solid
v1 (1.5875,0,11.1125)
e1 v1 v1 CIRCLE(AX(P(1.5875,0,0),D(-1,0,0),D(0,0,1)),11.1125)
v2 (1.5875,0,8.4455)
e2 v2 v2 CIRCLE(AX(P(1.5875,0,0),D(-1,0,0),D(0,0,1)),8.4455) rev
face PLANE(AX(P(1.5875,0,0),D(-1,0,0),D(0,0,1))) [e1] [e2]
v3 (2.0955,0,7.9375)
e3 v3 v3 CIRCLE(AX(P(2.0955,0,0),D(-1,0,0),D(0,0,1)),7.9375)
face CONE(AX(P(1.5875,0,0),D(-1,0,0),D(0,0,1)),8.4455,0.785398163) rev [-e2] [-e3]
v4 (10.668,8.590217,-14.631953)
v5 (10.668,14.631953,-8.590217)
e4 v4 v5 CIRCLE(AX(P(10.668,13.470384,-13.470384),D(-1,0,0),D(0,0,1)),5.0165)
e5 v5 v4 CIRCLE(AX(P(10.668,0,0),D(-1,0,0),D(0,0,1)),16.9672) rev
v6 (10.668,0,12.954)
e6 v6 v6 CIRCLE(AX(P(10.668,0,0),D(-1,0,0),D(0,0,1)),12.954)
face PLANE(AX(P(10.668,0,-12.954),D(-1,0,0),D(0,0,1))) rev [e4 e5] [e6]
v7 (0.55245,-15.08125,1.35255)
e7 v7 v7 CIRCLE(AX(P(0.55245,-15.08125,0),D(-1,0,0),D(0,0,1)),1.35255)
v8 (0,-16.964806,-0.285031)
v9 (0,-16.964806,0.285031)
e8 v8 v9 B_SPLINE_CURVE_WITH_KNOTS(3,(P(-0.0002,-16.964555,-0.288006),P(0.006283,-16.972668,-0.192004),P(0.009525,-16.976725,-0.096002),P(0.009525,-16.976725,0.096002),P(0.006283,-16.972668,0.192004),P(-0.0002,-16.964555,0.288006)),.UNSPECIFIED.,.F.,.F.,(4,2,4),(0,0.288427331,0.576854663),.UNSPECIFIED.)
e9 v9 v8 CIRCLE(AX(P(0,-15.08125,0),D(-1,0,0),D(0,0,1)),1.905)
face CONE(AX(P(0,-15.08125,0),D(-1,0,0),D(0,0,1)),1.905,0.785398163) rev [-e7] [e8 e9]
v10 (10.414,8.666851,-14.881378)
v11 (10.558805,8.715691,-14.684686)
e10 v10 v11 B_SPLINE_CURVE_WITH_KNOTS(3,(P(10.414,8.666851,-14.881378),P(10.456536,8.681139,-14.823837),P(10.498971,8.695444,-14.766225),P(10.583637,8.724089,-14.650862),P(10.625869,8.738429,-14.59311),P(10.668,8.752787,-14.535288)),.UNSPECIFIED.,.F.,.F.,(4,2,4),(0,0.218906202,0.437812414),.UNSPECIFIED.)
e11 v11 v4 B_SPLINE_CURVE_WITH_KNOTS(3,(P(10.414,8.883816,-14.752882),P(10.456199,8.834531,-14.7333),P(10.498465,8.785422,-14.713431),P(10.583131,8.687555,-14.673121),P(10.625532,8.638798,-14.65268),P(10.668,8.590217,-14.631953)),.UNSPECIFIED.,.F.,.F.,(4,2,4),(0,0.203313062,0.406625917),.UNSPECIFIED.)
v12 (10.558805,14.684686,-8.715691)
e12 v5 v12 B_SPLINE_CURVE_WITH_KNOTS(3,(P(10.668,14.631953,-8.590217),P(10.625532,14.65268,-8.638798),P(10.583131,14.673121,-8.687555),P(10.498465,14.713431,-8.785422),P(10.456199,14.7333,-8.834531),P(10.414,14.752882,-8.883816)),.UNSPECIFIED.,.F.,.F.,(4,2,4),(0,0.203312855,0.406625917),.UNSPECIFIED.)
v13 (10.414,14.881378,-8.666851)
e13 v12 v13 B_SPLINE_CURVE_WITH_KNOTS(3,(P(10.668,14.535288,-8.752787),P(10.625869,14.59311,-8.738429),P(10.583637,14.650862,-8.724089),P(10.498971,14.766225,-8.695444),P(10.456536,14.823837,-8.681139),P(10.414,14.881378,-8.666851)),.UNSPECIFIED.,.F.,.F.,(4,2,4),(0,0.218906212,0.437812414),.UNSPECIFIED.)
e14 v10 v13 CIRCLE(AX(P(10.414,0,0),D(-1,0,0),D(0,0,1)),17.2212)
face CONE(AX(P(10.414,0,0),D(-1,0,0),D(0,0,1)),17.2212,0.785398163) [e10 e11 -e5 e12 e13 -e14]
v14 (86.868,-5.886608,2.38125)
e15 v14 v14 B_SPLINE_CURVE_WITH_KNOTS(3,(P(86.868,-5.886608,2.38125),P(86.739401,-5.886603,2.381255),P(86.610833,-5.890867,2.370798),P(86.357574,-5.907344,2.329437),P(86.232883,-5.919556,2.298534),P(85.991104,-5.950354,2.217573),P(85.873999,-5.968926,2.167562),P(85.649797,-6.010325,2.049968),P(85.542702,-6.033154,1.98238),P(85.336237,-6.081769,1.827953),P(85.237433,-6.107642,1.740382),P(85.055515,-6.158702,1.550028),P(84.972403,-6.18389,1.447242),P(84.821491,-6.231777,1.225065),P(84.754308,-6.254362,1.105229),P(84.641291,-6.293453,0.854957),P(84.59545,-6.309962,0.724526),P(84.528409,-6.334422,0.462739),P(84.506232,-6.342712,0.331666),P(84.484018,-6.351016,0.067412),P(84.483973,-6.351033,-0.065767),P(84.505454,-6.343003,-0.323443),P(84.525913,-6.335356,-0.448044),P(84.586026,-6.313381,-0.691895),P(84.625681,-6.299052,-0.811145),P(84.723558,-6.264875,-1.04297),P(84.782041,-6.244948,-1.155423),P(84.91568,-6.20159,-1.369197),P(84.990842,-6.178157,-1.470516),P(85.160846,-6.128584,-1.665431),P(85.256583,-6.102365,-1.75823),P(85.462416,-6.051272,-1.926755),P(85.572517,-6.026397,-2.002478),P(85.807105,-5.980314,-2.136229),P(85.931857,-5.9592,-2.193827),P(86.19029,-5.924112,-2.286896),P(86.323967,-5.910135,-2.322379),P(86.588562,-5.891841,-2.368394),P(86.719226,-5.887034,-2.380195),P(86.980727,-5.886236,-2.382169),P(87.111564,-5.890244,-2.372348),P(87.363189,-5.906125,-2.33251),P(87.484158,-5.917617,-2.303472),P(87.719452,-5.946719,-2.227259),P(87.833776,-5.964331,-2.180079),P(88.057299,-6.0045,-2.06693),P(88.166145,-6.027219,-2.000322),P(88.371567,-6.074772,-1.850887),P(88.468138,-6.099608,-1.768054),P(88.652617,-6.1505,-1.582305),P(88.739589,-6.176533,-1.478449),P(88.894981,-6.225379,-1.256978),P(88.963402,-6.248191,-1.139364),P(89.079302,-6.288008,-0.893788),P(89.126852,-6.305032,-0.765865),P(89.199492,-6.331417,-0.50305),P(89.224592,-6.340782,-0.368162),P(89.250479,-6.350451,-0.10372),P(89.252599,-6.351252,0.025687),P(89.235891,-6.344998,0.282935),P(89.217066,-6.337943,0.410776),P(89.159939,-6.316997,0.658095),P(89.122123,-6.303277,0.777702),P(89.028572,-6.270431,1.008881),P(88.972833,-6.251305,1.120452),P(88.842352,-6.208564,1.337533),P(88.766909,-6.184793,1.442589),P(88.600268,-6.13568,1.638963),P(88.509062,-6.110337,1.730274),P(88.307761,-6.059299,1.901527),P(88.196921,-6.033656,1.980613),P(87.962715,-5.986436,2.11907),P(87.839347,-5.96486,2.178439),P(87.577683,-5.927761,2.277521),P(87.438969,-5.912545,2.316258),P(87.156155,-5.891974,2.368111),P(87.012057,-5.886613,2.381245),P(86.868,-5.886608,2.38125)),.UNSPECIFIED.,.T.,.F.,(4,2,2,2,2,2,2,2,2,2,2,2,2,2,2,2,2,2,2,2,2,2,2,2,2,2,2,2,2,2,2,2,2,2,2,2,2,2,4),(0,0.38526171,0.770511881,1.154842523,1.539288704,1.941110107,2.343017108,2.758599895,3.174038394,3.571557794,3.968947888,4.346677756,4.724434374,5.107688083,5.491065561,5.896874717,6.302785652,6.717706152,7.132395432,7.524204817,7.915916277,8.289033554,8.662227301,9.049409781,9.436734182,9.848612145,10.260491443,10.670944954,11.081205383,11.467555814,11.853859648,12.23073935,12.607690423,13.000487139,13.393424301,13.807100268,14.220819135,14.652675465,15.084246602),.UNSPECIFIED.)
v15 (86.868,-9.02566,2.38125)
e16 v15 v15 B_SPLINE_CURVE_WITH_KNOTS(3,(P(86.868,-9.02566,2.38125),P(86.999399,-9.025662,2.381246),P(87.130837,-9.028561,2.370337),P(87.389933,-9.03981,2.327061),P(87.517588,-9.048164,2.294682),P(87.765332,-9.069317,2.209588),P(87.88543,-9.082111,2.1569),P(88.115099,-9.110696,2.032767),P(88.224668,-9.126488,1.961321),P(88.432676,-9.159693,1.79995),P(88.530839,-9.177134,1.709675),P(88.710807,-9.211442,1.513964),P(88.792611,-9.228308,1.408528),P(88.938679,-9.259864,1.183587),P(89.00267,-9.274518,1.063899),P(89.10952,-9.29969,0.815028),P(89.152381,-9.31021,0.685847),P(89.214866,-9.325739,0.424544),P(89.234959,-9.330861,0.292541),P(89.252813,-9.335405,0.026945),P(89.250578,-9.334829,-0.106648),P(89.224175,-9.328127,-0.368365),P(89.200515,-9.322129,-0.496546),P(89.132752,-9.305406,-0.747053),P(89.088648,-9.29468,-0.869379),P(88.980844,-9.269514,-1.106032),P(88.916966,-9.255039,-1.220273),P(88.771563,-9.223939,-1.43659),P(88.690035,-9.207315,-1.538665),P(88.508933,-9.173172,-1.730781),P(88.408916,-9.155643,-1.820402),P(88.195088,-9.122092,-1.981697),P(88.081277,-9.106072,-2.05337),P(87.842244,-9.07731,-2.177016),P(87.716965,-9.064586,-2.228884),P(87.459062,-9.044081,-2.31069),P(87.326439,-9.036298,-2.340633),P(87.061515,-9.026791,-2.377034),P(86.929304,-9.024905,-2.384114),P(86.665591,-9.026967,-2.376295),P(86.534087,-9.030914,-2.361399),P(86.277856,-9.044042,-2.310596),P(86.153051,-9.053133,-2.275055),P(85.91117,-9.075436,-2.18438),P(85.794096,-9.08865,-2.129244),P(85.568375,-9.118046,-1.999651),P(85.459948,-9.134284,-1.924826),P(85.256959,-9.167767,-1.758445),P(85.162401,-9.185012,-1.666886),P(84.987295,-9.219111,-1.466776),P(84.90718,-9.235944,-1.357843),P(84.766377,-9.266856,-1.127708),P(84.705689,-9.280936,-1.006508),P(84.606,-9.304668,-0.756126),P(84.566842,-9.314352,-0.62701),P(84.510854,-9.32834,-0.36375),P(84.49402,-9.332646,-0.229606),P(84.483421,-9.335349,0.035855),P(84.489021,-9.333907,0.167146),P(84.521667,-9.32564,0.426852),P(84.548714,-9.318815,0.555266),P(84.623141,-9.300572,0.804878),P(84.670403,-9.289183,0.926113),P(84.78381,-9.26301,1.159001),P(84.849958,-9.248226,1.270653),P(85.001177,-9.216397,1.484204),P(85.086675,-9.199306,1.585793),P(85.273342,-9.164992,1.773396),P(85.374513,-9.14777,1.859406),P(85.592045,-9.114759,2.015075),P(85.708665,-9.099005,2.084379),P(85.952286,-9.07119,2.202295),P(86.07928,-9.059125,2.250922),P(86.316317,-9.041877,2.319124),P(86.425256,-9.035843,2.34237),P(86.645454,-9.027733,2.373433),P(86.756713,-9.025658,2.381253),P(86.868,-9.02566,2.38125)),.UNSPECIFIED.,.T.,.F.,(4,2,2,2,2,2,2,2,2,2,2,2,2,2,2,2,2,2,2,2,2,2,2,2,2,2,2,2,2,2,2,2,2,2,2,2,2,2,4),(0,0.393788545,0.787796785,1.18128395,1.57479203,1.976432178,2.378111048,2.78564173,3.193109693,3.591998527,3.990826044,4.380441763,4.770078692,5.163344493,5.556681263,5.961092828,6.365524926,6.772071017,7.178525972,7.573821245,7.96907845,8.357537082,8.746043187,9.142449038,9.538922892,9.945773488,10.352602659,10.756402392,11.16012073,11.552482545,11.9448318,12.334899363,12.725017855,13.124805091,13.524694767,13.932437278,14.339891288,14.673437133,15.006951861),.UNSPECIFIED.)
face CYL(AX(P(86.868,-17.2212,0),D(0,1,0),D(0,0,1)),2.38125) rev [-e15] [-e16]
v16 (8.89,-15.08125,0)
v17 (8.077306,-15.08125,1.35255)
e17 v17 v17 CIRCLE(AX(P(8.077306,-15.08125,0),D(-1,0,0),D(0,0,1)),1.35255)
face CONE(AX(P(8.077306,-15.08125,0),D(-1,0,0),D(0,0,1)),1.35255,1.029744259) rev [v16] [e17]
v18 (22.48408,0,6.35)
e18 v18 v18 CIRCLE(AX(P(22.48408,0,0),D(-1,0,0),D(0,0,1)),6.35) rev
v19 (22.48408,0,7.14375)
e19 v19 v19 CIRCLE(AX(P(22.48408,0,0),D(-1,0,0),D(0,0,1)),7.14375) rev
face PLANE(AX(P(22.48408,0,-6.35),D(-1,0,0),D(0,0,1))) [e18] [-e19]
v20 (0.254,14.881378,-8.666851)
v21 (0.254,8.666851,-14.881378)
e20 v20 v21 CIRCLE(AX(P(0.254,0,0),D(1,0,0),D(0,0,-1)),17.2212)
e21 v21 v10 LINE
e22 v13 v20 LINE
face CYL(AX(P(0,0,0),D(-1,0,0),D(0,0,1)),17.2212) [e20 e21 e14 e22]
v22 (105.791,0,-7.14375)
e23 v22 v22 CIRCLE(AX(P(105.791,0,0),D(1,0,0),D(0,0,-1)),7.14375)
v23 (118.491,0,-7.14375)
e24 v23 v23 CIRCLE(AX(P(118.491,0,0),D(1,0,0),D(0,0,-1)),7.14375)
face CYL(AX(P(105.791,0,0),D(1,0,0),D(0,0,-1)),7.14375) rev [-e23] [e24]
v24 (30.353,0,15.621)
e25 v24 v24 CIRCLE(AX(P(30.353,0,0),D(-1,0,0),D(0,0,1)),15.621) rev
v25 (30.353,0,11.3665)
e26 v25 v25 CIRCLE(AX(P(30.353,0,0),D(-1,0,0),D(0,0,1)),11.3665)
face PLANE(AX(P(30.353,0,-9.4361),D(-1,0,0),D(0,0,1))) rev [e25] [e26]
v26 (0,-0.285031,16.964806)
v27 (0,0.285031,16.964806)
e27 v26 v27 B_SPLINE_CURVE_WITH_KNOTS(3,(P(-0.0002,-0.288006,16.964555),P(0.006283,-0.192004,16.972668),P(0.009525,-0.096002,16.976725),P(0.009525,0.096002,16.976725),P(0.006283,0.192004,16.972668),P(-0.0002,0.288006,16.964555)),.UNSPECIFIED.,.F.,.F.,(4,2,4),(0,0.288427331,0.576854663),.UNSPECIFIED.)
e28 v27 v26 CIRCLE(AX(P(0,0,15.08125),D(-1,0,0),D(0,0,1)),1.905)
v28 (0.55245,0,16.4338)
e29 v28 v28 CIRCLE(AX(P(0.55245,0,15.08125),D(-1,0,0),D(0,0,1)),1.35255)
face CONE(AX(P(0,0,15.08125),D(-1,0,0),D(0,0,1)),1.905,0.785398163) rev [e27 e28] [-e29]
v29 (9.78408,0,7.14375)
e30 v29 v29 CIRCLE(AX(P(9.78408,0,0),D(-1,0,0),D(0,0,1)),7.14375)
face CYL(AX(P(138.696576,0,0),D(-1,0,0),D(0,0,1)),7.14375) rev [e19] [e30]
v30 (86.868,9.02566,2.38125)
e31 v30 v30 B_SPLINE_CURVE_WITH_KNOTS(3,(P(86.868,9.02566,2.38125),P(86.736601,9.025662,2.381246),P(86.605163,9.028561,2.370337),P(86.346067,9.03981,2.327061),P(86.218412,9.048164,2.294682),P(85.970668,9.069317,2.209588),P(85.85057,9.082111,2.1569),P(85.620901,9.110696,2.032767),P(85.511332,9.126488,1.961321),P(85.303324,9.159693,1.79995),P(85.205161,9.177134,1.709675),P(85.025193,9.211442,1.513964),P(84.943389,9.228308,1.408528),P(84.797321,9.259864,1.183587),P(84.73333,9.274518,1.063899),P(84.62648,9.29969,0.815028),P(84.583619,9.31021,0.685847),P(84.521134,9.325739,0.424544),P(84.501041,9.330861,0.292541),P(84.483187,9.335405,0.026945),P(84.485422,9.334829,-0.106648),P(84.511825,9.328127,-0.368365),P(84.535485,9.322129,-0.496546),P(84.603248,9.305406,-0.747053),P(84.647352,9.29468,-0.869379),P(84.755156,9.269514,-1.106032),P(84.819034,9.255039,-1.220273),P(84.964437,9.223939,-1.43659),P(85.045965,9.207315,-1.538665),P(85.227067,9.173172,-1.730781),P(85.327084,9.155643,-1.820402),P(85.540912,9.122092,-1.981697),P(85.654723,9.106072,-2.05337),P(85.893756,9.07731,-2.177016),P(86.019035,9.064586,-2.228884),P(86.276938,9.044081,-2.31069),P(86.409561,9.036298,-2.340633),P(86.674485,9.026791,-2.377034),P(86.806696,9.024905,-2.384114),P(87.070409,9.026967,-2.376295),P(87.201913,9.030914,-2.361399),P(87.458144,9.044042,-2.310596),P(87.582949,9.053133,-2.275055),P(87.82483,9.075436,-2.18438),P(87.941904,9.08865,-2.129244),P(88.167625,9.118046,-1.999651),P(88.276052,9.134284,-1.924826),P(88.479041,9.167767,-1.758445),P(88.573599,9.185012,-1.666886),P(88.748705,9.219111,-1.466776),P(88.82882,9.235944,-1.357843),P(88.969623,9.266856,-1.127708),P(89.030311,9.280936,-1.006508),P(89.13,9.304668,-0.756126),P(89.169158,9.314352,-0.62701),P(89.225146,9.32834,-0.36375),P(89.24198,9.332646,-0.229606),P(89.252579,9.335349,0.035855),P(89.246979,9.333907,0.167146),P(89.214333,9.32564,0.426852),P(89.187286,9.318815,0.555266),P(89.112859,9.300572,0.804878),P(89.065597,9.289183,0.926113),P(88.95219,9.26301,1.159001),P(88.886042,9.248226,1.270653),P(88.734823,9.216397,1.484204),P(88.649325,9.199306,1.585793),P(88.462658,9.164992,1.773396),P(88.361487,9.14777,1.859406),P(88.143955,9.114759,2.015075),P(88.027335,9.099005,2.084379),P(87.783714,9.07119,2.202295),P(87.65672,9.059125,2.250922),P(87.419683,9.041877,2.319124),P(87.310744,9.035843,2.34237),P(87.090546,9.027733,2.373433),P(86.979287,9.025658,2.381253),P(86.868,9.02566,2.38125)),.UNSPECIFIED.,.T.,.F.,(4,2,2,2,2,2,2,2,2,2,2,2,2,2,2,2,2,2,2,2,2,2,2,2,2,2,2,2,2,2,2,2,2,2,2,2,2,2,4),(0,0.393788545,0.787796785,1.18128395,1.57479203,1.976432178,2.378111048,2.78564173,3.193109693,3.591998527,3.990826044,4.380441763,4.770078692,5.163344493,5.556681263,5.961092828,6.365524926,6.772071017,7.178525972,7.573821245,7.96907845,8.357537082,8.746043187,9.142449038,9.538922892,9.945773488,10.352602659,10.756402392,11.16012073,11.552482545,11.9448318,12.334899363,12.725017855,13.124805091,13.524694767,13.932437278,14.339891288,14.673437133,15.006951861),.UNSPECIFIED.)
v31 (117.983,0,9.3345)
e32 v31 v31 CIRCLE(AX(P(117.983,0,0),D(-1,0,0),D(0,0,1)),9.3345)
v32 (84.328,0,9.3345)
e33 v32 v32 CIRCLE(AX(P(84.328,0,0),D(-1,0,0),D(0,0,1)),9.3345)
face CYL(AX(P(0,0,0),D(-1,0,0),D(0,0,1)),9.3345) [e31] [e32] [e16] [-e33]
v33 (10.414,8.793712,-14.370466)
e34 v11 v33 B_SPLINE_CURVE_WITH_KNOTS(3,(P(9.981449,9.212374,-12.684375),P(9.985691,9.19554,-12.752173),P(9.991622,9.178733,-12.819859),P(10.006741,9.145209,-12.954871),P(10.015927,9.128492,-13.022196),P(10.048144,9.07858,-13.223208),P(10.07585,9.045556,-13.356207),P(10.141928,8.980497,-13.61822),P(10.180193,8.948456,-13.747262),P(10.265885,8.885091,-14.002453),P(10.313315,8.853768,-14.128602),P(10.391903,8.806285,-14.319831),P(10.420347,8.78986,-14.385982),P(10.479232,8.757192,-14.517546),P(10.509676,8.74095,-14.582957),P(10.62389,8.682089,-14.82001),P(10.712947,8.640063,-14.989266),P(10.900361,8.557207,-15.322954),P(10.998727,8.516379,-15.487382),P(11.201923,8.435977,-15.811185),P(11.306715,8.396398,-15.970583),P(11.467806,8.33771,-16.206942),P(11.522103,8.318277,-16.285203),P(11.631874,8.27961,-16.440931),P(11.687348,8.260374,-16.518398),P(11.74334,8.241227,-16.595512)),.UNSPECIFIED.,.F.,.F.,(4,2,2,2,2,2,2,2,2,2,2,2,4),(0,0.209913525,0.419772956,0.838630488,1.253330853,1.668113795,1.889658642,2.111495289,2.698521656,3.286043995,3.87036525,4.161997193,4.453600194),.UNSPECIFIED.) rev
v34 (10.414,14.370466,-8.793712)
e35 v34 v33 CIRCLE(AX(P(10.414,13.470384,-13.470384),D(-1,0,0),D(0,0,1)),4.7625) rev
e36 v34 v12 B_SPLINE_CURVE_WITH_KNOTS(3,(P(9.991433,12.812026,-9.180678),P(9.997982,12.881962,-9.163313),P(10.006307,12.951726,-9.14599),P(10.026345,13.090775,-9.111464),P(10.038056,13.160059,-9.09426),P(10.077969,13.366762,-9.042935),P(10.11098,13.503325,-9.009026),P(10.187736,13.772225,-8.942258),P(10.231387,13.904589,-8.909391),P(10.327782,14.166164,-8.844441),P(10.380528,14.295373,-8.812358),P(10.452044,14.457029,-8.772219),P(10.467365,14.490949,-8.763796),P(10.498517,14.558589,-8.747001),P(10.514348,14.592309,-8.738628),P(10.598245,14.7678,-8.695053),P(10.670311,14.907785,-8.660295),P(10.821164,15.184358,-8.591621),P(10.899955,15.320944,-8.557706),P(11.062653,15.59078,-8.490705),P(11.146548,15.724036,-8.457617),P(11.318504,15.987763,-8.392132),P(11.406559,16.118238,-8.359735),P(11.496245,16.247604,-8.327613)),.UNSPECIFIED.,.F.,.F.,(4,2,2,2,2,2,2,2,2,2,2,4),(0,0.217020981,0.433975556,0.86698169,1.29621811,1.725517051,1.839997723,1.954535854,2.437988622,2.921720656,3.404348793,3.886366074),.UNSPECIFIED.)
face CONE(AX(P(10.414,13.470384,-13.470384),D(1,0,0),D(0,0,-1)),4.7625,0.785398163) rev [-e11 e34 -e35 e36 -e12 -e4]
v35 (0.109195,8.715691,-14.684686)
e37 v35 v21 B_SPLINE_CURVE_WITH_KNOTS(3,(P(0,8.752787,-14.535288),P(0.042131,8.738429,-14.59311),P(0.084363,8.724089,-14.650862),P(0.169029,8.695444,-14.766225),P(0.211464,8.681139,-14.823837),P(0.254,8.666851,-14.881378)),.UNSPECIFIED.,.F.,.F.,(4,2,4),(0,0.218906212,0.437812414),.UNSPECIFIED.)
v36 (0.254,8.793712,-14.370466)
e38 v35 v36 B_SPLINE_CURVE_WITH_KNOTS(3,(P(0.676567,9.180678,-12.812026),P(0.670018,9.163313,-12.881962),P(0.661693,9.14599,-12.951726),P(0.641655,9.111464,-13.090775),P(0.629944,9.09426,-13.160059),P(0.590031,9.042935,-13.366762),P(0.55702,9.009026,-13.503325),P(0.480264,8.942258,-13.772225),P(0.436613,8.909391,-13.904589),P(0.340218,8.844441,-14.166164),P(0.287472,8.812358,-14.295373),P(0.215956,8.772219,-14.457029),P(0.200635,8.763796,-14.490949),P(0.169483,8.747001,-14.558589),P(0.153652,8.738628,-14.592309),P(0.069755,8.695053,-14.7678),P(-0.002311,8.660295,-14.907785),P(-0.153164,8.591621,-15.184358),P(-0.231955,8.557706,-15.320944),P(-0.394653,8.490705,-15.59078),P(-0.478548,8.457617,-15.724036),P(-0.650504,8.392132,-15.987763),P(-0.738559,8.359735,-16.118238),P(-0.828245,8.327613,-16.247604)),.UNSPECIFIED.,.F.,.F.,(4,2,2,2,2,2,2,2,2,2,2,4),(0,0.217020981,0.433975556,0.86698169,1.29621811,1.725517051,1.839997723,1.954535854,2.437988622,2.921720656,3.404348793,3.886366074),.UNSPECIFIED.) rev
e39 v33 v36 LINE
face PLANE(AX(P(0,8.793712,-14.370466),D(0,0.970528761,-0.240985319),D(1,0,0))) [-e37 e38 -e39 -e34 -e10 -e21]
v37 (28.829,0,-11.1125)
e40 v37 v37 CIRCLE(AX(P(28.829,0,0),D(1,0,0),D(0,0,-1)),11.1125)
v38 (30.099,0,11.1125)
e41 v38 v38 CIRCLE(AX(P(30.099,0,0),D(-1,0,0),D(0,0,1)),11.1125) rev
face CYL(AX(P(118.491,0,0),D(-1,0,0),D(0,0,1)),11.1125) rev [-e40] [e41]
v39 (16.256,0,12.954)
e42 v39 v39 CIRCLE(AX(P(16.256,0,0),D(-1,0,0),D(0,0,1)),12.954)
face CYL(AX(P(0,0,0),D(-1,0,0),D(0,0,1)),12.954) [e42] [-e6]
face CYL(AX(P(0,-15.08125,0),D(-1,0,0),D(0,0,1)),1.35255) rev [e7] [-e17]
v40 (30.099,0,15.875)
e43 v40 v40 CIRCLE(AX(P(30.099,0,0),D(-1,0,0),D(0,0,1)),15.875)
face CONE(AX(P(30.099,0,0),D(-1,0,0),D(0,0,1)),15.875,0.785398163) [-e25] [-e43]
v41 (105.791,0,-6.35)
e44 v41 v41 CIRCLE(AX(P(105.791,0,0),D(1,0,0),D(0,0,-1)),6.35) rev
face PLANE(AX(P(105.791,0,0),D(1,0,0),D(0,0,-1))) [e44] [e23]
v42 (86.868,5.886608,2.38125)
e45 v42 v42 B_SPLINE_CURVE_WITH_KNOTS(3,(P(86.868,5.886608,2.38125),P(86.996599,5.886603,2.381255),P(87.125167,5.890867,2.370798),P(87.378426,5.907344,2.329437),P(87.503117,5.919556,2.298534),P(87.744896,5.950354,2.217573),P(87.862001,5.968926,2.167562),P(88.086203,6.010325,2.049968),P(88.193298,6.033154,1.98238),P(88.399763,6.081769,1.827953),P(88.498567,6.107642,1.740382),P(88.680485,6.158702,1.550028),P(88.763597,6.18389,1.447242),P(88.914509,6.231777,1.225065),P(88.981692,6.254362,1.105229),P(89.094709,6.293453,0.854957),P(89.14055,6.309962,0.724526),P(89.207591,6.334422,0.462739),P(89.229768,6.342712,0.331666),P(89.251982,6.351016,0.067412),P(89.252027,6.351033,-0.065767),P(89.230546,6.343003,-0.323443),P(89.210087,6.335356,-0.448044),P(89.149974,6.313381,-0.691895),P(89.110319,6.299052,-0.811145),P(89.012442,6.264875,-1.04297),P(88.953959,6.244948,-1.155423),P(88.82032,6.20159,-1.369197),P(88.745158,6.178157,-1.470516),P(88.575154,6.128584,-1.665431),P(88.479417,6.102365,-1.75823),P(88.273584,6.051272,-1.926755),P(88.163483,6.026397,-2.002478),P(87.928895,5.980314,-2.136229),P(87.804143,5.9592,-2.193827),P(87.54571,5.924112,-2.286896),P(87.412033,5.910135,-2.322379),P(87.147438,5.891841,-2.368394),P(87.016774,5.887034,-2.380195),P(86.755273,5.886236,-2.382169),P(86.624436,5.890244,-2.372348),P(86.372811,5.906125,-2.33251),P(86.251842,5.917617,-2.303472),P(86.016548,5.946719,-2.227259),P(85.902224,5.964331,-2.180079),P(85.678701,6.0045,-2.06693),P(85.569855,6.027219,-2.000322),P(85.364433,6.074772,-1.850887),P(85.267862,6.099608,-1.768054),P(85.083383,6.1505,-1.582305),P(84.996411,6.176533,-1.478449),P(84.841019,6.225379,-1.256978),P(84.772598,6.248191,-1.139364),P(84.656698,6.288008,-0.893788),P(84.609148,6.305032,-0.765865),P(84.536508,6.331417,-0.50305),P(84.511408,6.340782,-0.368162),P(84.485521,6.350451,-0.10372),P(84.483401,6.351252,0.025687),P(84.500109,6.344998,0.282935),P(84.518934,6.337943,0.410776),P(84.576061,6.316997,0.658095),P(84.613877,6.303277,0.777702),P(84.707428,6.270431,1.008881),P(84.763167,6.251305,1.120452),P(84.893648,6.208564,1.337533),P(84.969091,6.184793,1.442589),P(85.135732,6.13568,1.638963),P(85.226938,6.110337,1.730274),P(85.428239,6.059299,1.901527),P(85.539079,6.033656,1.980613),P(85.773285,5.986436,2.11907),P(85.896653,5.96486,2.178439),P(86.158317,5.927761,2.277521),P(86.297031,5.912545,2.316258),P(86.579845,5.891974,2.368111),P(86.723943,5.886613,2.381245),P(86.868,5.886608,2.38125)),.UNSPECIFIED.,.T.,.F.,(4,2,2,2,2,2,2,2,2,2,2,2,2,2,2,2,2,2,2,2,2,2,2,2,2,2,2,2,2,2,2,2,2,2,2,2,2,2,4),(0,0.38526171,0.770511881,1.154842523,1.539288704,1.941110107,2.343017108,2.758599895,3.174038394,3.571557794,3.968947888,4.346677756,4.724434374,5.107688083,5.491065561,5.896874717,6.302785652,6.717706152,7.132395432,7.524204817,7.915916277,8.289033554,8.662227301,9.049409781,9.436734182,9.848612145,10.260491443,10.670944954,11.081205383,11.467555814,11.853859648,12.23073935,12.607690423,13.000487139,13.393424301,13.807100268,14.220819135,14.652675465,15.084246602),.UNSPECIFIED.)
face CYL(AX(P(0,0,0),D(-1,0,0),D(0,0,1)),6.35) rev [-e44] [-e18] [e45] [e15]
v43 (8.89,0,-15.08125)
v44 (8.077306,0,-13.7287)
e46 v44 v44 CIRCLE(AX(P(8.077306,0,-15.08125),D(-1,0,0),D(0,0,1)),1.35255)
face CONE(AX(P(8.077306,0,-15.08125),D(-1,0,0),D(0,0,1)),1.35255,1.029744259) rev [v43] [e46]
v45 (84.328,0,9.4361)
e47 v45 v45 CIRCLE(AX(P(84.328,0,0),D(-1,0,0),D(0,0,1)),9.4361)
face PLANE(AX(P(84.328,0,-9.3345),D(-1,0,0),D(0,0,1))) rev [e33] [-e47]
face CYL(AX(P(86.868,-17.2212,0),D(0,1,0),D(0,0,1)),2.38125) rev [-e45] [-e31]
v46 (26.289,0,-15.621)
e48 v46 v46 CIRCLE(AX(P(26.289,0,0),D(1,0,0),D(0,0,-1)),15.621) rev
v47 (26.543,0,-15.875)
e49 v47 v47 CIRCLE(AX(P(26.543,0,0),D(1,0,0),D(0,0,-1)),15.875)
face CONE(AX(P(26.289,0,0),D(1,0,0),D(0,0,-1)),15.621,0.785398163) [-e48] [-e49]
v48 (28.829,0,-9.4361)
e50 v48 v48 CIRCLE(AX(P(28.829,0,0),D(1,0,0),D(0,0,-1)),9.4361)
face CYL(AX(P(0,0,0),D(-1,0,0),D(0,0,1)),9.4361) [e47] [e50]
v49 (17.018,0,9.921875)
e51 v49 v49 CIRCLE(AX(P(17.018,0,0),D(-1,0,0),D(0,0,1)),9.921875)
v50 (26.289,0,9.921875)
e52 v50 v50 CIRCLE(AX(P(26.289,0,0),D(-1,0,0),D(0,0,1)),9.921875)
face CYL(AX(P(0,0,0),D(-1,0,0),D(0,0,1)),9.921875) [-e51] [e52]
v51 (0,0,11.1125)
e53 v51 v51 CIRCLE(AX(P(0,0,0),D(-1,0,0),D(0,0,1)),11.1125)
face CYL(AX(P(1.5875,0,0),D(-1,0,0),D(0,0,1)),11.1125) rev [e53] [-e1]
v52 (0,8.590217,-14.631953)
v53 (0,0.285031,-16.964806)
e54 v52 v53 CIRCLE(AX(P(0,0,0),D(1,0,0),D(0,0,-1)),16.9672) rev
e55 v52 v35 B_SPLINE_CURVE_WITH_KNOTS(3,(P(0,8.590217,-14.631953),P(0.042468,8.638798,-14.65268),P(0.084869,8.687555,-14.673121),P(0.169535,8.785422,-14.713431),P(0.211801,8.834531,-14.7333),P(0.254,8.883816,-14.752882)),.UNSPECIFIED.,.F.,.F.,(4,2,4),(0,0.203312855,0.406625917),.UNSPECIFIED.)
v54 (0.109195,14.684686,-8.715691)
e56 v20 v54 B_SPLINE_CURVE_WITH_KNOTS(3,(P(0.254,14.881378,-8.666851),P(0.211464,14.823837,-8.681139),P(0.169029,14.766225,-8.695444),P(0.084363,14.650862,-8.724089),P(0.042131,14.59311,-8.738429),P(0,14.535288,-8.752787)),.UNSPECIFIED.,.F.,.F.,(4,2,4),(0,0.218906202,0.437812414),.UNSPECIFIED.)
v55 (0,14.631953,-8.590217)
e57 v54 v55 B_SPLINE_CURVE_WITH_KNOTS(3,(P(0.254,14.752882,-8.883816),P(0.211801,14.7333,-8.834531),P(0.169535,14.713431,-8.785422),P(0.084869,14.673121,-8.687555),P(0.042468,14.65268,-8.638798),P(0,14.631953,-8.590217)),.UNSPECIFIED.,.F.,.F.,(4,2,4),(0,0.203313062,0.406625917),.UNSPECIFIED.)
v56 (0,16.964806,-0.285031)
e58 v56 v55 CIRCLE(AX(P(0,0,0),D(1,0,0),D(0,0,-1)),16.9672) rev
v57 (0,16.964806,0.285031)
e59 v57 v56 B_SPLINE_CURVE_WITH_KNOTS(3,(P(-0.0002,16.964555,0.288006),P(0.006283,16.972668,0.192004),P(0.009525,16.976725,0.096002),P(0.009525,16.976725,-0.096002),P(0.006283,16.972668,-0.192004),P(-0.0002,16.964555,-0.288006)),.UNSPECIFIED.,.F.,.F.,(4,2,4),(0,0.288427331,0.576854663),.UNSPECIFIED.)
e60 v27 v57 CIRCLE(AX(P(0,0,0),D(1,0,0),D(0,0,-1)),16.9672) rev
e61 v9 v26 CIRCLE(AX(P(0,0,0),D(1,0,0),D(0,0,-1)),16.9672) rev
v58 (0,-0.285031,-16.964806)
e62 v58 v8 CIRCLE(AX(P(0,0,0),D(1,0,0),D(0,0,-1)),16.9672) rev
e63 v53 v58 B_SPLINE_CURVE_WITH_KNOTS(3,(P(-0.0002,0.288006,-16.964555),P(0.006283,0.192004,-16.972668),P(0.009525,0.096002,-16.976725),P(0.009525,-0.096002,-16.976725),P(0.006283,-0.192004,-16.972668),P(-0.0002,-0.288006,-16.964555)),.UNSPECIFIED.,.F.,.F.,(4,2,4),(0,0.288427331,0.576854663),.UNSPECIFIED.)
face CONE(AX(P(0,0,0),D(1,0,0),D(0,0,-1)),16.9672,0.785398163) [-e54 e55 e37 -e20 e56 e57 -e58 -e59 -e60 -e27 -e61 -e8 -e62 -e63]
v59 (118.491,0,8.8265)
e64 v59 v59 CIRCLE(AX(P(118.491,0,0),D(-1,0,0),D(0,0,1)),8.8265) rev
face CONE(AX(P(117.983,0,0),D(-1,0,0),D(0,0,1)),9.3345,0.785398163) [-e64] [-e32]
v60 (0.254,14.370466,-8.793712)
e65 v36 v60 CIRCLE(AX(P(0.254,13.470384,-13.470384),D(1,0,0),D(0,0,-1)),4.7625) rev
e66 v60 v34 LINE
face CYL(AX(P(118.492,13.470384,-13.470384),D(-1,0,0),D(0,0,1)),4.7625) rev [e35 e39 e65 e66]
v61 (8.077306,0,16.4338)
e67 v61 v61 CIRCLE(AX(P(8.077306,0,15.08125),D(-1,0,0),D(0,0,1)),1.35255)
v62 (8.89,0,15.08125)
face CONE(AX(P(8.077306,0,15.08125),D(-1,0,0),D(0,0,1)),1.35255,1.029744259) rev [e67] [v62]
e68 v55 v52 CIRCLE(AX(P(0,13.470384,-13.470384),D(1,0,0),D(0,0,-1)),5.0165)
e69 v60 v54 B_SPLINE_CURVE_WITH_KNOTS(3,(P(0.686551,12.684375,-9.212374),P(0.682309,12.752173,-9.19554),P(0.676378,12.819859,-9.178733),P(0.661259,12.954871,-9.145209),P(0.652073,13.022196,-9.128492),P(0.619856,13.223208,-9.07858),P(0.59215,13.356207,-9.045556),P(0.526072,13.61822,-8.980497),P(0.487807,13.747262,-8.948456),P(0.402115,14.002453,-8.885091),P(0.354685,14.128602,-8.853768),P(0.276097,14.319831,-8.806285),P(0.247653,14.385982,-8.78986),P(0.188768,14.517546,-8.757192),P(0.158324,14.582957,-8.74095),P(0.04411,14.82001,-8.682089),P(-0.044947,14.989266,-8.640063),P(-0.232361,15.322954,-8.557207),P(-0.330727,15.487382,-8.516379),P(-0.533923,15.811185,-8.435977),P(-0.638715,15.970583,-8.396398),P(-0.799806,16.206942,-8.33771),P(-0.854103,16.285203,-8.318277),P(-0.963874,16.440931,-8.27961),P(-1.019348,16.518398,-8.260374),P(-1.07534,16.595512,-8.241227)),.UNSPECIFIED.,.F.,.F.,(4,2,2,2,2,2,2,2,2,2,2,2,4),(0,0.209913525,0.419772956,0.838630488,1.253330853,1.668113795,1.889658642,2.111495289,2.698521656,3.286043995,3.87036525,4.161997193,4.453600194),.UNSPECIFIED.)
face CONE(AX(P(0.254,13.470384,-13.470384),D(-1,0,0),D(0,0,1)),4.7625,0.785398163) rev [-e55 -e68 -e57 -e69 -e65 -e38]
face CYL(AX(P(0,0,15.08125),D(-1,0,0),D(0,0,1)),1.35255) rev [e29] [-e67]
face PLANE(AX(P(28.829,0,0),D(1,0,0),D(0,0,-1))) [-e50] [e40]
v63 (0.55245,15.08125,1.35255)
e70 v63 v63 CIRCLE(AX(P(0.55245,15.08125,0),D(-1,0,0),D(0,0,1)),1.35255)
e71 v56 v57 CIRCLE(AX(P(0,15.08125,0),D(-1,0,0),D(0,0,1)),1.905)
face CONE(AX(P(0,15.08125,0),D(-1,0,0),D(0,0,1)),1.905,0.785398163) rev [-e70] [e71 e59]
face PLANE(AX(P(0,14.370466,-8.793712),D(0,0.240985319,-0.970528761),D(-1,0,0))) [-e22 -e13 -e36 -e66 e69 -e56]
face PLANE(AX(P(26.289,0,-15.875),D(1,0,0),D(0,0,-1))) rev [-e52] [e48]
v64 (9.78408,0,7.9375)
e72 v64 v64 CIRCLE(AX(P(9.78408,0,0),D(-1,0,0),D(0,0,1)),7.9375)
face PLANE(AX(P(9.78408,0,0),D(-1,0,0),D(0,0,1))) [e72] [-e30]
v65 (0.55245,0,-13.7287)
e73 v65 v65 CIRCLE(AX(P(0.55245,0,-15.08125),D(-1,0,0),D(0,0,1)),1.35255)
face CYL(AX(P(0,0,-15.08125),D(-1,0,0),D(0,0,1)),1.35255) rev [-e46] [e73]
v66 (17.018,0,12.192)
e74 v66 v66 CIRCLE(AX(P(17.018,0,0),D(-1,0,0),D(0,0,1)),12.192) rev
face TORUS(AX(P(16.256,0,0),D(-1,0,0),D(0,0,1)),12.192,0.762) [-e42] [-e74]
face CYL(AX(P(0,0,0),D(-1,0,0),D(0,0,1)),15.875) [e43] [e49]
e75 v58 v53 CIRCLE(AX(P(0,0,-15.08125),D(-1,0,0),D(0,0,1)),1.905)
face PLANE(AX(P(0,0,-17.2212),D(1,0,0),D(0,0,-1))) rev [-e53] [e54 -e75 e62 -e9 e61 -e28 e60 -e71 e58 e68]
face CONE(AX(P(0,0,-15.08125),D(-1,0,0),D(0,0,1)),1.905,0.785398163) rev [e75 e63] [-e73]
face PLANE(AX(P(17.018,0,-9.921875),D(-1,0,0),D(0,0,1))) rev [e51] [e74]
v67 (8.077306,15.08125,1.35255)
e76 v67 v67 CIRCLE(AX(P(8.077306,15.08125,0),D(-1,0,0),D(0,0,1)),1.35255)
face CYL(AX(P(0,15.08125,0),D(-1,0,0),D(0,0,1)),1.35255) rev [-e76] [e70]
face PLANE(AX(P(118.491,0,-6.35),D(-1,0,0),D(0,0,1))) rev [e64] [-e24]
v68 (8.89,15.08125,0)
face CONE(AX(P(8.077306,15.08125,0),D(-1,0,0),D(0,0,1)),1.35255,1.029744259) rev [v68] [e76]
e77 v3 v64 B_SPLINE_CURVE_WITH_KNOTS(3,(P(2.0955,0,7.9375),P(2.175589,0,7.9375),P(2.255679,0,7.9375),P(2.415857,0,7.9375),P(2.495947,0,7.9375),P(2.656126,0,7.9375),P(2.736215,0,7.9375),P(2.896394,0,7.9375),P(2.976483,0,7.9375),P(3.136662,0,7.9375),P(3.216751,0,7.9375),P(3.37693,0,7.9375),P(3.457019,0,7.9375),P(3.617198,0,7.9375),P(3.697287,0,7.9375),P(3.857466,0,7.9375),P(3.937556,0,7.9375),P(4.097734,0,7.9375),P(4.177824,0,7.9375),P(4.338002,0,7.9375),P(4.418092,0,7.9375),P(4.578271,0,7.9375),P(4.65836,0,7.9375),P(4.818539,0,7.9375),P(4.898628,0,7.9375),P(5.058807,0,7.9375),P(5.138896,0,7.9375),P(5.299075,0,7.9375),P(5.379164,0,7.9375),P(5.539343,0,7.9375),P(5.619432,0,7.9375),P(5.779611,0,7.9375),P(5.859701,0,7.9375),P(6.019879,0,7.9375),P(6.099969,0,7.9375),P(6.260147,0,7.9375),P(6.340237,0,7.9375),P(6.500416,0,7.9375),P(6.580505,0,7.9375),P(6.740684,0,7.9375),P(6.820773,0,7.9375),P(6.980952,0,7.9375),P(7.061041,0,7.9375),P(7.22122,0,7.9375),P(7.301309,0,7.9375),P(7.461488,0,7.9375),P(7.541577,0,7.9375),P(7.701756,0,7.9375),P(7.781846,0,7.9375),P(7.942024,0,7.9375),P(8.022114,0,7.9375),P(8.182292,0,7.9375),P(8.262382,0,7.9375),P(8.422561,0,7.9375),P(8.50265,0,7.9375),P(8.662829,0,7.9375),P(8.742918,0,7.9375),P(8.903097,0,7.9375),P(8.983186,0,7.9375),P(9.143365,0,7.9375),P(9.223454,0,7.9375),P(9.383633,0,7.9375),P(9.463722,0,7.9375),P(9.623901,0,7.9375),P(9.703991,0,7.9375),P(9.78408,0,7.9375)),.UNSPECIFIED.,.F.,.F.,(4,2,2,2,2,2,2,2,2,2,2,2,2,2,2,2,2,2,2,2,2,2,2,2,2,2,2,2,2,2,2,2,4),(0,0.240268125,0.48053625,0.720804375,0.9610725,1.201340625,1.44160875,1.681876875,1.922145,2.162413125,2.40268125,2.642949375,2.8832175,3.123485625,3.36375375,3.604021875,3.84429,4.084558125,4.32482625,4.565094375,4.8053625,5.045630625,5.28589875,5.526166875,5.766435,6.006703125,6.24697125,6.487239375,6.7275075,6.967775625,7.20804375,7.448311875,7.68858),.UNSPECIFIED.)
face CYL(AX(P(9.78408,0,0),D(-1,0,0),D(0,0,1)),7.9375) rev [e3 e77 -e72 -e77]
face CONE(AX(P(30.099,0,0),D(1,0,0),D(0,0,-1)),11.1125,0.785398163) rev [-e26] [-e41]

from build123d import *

# Parameters (mm, degrees)
CHAMFER1_SIZE                   = 0.508
CHAMFER2_SIZE                   = 0.254
FILLET1_R                       = 0.762
F_6_32_TAPPED_HOLE1_D           = 2.7051
F_6_32_TAPPED_HOLE1_DEPTH       = 8.07730597
F_6_32_TAPPED_HOLE1_CSINK_D     = 3.81
F_6_32_TAPPED_HOLE1_CSINK_ANGLE = 90
F_6_32_TAPPED_HOLE1_TIP         = 0.81269403
CUT_EXTRUDE1_REACH              = 122.968
SKETCH4_R                       = 4.7625
CHAMFER3_SIZE                   = 0.254
SKETCH5_R                       = 7.9375
CUT_EXTRUDE2_DEPTH              = 9.78408
SKETCH6_R                       = 11.1125
CUT_EXTRUDE3_DEPTH              = 1.5875
CHAMFER4_SIZE                   = 0.508
CUT_EXTRUDE4_DEPTH              = 121.967997999
CUT_EXTRUDE4_DEPTH_BACK         = 121.967997999
SKETCH7_R                       = 2.38125
CUT_EXTRUDE5_DEPTH              = 92.440945536
CUT_EXTRUDE5_DEPTH_BACK         = 1.524
SKETCH8_R                       = 11.1125
SKETCH8_R_2                     = 9.4361
CHAMFER5_SIZE                   = 0.254
SKETCH9_R                       = 7.14375
CUT_EXTRUDE6_DEPTH              = 12.7
CUT_EXTRUDE7_START              = -12.7
SKETCH10_R                      = 7.14375
CUT_EXTRUDE7_DEPTH              = 12.7


with BuildPart() as part:
    # Sketch1 → Revolve1 (revolve)
    with BuildSketch(Plane(origin=(0, 0, 0), x_dir=(1, 0, 0), z_dir=(0, 1, 0)), mode=Mode.PRIVATE) as revolve1_sk:
        Polygon((0, 6.35), (118.491, 6.35), (118.491, 9.3345), (84.328, 9.3345), (84.328, 9.4361), (30.353, 9.4361), (30.353, 15.875), (26.289, 15.875), (26.289, 9.921875), (17.018, 9.921875), (17.018, 12.954), (10.668, 12.954), (10.668, 17.2212), (0, 17.2212), align=None)
    revolve(revolve1_sk.sketch.rotate(Axis((0, 0, 0), (1, 0, 0)), 180), axis=Axis((0, 0, 0), (1, 0, 0)))

    # Chamfer1
    chamfer1_edges = [part.edges().sort_by_distance(p)[0] for p in [
        (118.491, 0, -9.3345),
    ]]
    chamfer(chamfer1_edges, length=CHAMFER1_SIZE)

    # Chamfer2
    chamfer2_edges = [part.edges().sort_by_distance(p)[0] for p in [
        (0, 0, -17.2212),
        (10.668, 0, -17.2212),
        (26.289, 0, -15.875),
        (30.353, 0, -15.875),
    ]]
    chamfer(chamfer2_edges, length=CHAMFER2_SIZE)

    # Fillet1
    fillet1_edges = [part.edges().sort_by_distance(p)[0] for p in [
        (17.018, 0, -12.954),
    ]]
    fillet(fillet1_edges, radius=FILLET1_R)

    # #6-32 Tapped Hole1
    with Locations(Plane.ZY):
        with Locations((0, 15.08125), (15.08125, 0), (0, -15.08125), (-15.08125, 0)):
            CounterSinkHole(F_6_32_TAPPED_HOLE1_D / 2, F_6_32_TAPPED_HOLE1_CSINK_D / 2, depth=F_6_32_TAPPED_HOLE1_DEPTH, counter_sink_angle=F_6_32_TAPPED_HOLE1_CSINK_ANGLE)
            with Locations((0, 0, -(F_6_32_TAPPED_HOLE1_DEPTH + F_6_32_TAPPED_HOLE1_TIP / 2))):  # 118° drill point
                Cone(0, F_6_32_TAPPED_HOLE1_D / 2, F_6_32_TAPPED_HOLE1_TIP, mode=Mode.SUBTRACT)

    # Sketch4 → Cut-Extrude1 (cut, up to next)
    with BuildSketch(Plane.ZY, mode=Mode.PRIVATE) as cut_extrude1_sk1:
        with Locations((-13.470384182, 13.470384182)):
            Circle(SKETCH4_R)
    cut_extrude1_tool1 = extrude(cut_extrude1_sk1.sketch, amount=-CUT_EXTRUDE1_REACH, mode=Mode.PRIVATE) & part.part
    add(cut_extrude1_tool1.solids().sort_by_distance((0, 13.470384, -13.470384))[0], mode=Mode.SUBTRACT)

    # Chamfer3
    # the kernel refuses this chamfer: 0.363987464, 0.254 mm, written as the material it takes off along each edge
    with BuildSketch(Plane(origin=(10.668, 13.470384182, -13.470384182), x_dir=(0, -0.9379671021668624, -0.34672426400916706), z_dir=(0, 0.34672426400916706, -0.9379671021668624))) as chamfer3_piece_1:
        Polygon((4.7625 + CHAMFER3_SIZE, 0), (4.7625, CHAMFER3_SIZE), (4.7625, 0), align=None)
    revolve(axis=Axis((10.668, 13.470384182, -13.470384182), (-1, 0, 0)), revolution_arc=130.574173679, mode=Mode.SUBTRACT)
    with BuildSketch(Plane(origin=(0, 13.470384182, -13.470384182), x_dir=(0, 0.3467242640091905, 0.9379671021668536), z_dir=(-1.1910571492459259e-15, 0.9379671021668536, -0.3467242640091905))) as chamfer3_piece_2:
        Polygon((4.7625 + CHAMFER3_SIZE, 0), (4.7625, CHAMFER3_SIZE), (4.7625, 0), align=None)
    revolve(axis=Axis((0, 13.470384182, -13.470384182), (1, 0, 0)), revolution_arc=130.574173679, mode=Mode.SUBTRACT)
    with BuildSketch(Plane(origin=(11.428728949, 14.75288233, -8.88381632), x_dir=(0, 0.509579415294029, 0.8604236279348654), z_dir=(-1, 0, 0))) as chamfer3_piece_3:
        with BuildLine():
            Line((0.252160633, 0), (-0.117343909, -0.374955046))
            ThreePointArc((-0.117343909, -0.374955046), (-0.056744739, -0.194875402), (0, 0))
            ThreePointArc((0, 0), (0.131188651, 0.00046078), (0.252160633, 0))
        make_face()
    extrude(amount=12.189457898, mode=Mode.SUBTRACT)
    with BuildSketch(Plane(origin=(11.428728949, 8.88381632, -14.75288233), x_dir=(0, -0.8604236279348554, -0.5095794152940455), z_dir=(-1, 0, 0))) as chamfer3_piece_4:
        with BuildLine():
            Line((0.252160633, 0), (-0.117343909, 0.374955046))
            ThreePointArc((-0.117343909, 0.374955046), (-0.056744739, 0.194875402), (0, 0))
            ThreePointArc((0, 0), (0.131188651, -0.00046078), (0.252160633, 0))
        make_face()
    extrude(amount=12.189457898, mode=Mode.SUBTRACT)

    # Sketch5 → Cut-Extrude2 (cut)
    with BuildSketch(Plane.ZY):
        Circle(SKETCH5_R)
    extrude(amount=-CUT_EXTRUDE2_DEPTH, mode=Mode.SUBTRACT)

    # Sketch6 → Cut-Extrude3 (cut)
    with BuildSketch(Plane.ZY):
        Circle(SKETCH6_R)
    extrude(amount=-CUT_EXTRUDE3_DEPTH, mode=Mode.SUBTRACT)

    # Chamfer4
    chamfer4_edges = [part.edges().sort_by_distance(p)[0] for p in [
        (1.5875, 0, -7.9375),
    ]]
    chamfer(chamfer4_edges, length=CHAMFER4_SIZE)

    # Sketch7 → Cut-Extrude4 (cut, two sides: drawn at the far end of the back side and taken through both)
    with BuildSketch(Plane(origin=(0, 0, 0), x_dir=(1, 0, 0), z_dir=(0, 1, 0)).offset(-CUT_EXTRUDE4_DEPTH_BACK)):
        with Locations(Location((86.868, 0, 0), (0, 0, 270))):
            Circle(SKETCH7_R)
    extrude(amount=CUT_EXTRUDE4_DEPTH + CUT_EXTRUDE4_DEPTH_BACK, mode=Mode.SUBTRACT)

    # Sketch8 → Cut-Extrude5 (cut, two sides: drawn at the far end of the back side and taken through both)
    with BuildSketch(Plane(origin=(30.353, 0, 0), x_dir=(0, 0, -1), z_dir=(1, 0, 0)).offset(-CUT_EXTRUDE5_DEPTH_BACK)):
        with Locations(Location((0, 0, 0), (0, 0, 180))):
            Circle(SKETCH8_R)
        with Locations(Location((0, 0, 0), (0, 0, 180))):
            Circle(SKETCH8_R_2, mode=Mode.SUBTRACT)
    extrude(amount=CUT_EXTRUDE5_DEPTH + CUT_EXTRUDE5_DEPTH_BACK, mode=Mode.SUBTRACT)

    # Chamfer5
    chamfer5_edges = [part.edges().sort_by_distance(p)[0] for p in [
        (30.353, 0, -11.1125),
    ]]
    chamfer(chamfer5_edges, length=CHAMFER5_SIZE)

    # Sketch9 → Cut-Extrude6 (cut)
    with BuildSketch(Plane(origin=(118.491, 0, 0), x_dir=(0, 0, -1), z_dir=(1, 0, 0))):
        Circle(SKETCH9_R)
    extrude(amount=-CUT_EXTRUDE6_DEPTH, mode=Mode.SUBTRACT)

    # Sketch10 → Cut-Extrude7 (cut)
    with BuildSketch(Plane.ZY.offset(-9.78408).offset(CUT_EXTRUDE7_START)):
        with Locations(Location((0, 0, 0), (0, 0, 180))):
            Circle(SKETCH10_R)
    extrude(amount=CUT_EXTRUDE7_DEPTH, mode=Mode.SUBTRACT)


solid = part.part
